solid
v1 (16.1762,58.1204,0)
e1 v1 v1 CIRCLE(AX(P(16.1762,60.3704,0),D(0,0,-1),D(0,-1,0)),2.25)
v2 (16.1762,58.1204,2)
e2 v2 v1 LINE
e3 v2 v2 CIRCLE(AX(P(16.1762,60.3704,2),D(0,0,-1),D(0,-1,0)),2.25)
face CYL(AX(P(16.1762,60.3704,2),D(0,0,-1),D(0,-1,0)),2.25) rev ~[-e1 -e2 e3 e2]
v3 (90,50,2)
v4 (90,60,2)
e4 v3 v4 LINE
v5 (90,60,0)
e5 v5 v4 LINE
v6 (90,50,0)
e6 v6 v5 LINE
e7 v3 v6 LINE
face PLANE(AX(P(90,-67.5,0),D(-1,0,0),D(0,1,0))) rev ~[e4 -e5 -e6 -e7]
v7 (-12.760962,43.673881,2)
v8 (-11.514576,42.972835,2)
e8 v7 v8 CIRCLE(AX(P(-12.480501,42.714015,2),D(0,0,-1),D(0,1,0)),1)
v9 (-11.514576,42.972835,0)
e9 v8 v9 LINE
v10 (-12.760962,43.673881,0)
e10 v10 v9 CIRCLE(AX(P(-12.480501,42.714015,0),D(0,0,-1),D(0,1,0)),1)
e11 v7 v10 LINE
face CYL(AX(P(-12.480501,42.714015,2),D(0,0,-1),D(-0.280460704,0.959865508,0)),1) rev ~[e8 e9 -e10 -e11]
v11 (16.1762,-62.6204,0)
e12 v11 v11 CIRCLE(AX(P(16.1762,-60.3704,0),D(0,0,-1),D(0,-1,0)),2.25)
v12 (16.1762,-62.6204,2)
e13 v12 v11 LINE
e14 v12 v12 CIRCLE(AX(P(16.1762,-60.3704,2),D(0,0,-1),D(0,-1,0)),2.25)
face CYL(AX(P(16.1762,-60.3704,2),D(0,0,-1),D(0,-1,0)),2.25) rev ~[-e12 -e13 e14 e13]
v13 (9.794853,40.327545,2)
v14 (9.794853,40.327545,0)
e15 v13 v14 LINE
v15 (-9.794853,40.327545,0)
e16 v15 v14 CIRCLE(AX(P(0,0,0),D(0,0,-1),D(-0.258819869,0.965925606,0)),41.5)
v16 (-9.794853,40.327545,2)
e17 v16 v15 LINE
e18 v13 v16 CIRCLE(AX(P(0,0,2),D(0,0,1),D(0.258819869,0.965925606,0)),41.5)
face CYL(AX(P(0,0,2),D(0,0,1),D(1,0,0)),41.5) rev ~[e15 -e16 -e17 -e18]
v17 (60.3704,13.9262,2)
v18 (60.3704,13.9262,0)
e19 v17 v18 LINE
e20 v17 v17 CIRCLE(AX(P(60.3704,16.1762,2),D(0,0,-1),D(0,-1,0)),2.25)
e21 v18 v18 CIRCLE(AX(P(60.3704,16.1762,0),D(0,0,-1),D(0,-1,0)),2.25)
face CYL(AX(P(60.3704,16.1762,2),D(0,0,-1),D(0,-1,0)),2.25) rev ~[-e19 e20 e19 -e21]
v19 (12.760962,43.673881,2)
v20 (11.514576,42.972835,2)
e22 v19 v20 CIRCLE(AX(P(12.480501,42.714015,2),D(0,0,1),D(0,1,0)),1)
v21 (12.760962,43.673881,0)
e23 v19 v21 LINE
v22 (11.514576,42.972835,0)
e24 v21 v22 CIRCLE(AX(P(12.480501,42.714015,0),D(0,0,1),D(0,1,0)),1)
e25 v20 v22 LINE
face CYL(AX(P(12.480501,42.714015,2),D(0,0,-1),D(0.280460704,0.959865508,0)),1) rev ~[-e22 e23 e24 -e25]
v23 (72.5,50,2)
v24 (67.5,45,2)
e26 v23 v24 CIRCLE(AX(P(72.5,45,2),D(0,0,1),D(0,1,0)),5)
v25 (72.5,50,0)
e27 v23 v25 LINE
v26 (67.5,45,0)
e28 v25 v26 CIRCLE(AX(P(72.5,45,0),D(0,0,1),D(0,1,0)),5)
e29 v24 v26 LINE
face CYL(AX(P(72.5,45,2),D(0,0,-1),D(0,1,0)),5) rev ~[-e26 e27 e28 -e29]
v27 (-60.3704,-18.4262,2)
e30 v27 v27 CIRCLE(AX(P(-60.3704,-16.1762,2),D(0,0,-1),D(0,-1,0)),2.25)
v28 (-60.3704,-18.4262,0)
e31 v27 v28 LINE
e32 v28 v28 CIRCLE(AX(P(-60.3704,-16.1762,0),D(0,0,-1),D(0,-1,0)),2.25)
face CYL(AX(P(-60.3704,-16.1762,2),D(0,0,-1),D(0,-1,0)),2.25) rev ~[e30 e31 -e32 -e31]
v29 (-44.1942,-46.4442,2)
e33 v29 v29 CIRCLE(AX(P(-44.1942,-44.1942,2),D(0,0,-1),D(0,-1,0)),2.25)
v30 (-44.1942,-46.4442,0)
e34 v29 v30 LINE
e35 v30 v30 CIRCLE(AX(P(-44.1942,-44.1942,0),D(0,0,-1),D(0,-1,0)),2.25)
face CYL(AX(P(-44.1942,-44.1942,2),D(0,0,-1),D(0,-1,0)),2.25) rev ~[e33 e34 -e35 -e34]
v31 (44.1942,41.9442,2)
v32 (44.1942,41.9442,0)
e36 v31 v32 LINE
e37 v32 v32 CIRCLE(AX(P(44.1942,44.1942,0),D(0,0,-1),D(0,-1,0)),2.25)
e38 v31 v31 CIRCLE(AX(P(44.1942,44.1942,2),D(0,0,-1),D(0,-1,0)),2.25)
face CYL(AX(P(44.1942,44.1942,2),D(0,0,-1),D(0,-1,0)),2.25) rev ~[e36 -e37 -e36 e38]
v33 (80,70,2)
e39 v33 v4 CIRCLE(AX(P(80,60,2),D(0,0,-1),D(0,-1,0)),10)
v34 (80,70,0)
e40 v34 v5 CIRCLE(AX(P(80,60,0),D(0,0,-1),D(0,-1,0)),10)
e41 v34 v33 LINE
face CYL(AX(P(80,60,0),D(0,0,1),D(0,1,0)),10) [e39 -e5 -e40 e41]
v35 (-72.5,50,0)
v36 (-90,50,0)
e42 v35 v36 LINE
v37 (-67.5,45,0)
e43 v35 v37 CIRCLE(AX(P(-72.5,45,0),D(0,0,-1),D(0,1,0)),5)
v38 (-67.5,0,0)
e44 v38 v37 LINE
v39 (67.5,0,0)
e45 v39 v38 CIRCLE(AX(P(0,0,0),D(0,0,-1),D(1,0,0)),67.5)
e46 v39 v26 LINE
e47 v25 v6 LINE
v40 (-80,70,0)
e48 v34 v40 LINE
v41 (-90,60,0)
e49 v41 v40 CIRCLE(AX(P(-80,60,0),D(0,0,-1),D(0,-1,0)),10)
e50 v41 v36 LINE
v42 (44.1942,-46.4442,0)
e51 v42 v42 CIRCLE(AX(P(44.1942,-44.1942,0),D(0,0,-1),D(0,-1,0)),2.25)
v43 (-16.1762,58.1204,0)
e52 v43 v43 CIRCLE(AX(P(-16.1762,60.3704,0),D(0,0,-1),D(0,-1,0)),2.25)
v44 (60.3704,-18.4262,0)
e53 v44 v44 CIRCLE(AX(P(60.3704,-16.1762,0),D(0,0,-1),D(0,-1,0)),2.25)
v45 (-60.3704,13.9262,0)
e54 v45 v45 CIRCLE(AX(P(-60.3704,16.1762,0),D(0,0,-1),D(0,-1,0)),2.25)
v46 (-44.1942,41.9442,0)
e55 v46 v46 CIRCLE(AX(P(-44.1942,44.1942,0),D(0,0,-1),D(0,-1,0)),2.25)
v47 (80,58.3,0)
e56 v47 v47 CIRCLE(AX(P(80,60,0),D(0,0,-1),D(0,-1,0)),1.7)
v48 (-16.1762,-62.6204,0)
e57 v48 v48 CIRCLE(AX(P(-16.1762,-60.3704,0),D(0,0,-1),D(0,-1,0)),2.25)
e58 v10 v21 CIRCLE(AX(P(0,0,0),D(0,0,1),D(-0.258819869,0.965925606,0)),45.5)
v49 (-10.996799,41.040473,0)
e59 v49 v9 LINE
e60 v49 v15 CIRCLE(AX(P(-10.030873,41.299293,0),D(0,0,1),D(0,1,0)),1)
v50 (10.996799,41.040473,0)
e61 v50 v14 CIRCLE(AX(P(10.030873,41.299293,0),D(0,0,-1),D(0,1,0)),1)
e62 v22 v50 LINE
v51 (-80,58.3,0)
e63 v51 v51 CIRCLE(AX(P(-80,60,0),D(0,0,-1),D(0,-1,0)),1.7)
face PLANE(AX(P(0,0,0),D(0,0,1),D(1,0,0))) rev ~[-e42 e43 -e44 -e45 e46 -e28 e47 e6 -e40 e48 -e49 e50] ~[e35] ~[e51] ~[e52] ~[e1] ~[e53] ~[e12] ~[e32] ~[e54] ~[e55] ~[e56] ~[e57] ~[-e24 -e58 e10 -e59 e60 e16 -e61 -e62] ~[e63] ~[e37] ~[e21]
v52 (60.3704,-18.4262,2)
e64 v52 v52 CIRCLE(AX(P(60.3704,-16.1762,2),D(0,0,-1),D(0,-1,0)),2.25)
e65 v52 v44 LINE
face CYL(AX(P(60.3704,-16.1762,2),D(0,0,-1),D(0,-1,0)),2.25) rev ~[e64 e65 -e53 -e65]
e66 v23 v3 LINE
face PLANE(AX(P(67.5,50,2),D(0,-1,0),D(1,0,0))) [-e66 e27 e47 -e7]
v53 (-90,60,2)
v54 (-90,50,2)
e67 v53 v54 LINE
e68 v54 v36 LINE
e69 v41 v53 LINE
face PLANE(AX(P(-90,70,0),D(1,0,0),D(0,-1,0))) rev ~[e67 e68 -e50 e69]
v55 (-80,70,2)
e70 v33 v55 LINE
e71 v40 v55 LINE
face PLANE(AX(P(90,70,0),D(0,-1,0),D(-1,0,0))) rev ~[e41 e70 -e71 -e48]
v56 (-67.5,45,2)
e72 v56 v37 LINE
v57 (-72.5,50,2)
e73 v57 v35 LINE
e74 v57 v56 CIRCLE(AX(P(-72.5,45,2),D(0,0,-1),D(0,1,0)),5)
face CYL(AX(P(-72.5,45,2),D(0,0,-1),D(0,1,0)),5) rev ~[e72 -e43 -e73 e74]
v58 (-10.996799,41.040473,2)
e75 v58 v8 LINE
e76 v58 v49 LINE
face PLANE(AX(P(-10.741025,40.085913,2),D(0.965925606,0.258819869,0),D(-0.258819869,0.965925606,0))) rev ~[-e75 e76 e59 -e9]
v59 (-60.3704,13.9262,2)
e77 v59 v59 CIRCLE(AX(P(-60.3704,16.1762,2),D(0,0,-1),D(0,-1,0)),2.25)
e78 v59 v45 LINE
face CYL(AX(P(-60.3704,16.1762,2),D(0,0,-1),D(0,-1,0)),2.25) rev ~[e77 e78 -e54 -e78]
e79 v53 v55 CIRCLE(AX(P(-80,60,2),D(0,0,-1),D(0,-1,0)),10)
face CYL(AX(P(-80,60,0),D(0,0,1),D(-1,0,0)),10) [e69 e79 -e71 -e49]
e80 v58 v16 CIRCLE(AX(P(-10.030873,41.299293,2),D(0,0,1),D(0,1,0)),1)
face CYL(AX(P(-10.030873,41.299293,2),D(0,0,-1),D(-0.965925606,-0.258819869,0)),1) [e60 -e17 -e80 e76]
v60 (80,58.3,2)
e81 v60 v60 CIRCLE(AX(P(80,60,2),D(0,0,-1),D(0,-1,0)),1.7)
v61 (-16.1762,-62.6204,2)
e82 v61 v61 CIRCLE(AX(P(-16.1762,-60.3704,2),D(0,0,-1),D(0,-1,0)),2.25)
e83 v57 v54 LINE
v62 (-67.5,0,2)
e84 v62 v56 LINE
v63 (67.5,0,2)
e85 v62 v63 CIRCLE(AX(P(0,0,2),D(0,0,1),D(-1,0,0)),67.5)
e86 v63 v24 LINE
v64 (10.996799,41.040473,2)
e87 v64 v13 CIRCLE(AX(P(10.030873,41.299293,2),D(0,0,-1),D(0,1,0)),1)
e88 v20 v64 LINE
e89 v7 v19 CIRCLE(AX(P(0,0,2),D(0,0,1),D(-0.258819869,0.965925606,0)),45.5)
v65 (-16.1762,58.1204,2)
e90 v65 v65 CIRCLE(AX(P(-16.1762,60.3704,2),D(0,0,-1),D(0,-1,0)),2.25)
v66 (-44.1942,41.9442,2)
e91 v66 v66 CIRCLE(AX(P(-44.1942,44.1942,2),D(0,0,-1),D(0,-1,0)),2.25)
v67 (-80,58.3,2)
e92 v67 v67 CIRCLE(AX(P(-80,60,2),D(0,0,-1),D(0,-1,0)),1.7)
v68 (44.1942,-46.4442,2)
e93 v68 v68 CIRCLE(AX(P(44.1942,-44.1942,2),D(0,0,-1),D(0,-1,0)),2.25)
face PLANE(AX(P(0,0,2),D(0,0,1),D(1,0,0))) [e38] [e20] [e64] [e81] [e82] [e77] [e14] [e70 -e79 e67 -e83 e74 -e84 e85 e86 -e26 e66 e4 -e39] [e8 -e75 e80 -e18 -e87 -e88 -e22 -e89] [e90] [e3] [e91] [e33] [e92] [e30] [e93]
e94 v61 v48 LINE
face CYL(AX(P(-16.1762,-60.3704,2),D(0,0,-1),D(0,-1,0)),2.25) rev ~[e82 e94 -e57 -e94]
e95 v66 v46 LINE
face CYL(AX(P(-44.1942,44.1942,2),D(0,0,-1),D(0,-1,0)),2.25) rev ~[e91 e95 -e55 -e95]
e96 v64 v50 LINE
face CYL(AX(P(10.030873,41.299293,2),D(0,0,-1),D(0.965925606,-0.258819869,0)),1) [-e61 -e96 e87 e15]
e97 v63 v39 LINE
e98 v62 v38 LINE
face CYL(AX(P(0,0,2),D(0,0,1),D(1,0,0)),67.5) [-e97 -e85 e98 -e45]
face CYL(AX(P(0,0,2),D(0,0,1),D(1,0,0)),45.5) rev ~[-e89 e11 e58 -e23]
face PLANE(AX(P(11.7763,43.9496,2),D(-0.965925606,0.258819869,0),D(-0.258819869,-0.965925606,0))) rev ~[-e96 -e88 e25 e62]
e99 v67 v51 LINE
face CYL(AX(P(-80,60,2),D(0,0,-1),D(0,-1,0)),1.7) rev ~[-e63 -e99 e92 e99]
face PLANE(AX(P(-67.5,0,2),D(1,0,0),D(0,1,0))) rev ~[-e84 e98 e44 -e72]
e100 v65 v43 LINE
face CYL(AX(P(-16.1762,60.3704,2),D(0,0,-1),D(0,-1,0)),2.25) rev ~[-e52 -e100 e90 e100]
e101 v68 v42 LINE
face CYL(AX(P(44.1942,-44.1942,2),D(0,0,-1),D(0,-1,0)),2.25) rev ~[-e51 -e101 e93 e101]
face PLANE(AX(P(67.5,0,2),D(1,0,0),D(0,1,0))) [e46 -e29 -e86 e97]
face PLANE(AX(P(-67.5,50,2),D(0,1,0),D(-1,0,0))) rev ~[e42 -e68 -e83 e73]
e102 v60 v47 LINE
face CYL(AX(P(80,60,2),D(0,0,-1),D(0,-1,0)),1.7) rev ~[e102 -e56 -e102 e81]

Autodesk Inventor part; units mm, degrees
ref_plane "YZ Plane" through (0, 0, 0) normal (1, 0, 0) x (0, 1, 0)
ref_plane "XZ Plane" through (0, 0, 0) normal (0, 1, 0) x (-1, 0, 0)
ref_plane "XY Plane" through (0, 0, 0) normal (0, 0, 1) x (1, 0, 0)
sketch "スケッチ1" plane through (0, 0, 0) normal (0, 0, 1) x (1, 0, 0)
  line L0 (-90, -67.5) -> (90, -67.5)
  line L1 (90, -67.5) -> (90, 70)
  line L2 (90, 70) -> (-90, 70)
  line L3 (-90, 70) -> (-90, -67.5)
  point P0 (0, 0)
  point P1 (-29.0861, -67.5)
  dimension "d37" = 90
  dimension "d38" = 70
  dimension "d40" = 90
  dimension "d41" = 67.5
extrude "プレート1" add sketch "スケッチ1" along normal blind 2
sketch "スケッチ2" plane through (0, 0, 2) normal (0, 0, 1) x (1, 0, 0)
  circle A0 centre (0, 0) radius 45.5
  dimension "d5" = 91
extrude "押し出し1" cut sketch "スケッチ2" against normal blind 10
sketch "スケッチ3" plane through (0, 0, 2) normal (0, 0, 1) x (1, 0, 0)
  circle A0 centre (0, 0) radius 62.5
  point P0 (-16.1762, 60.3704)
  point P1 (-44.1942, 44.1942)
  point P2 (-60.3704, 16.1762)
  point P3 (-60.3704, -16.1762)
  point P4 (-44.1942, -44.1942)
  point P5 (-16.1762, -60.3704)
  point P6 (16.1762, -60.3704)
  point P7 (44.1942, -44.1942)
  point P8 (60.3704, -16.1762)
  point P9 (60.3704, 16.1762)
  point P10 (44.1942, 44.1942)
  point P11 (16.1762, 60.3704)
  dimension "d8" = 125
  dimension "d11" = 360
  dimension "d20" = 0
hole "穴1" at (-16.1762, 60.3704, 2) at (-44.1942, 44.1942, 2) at (-60.3704, 16.1762, 2) at (-60.3704, -16.1762, 2) at (-44.1942, -44.1942, 2) at (-16.1762, -60.3704, 2) at (16.1762, -60.3704, 2) at (44.1942, -44.1942, 2) at (60.3704, -16.1762, 2) at (60.3704, 16.1762, 2) at (44.1942, 44.1942, 2) at (16.1762, 60.3704, 2) direction (0, 0, -1) diameter 4.5 end through all clearance for "Flat Head Machine Screw" size "M4" standard "Ansi Metric M Profile"
fillet "コーナーR2" radius 10 2 edges at (-90, 70, 1) (90, 70, 1)
sketch "スケッチ5" plane through (0, 0, 2) normal (0, 0, 1) x (1, 0, 0)
  arc A0 (-80, 70) -> (-90, 60) centre (-80, 60) ccw projected
  arc A1 (90, 60) -> (80, 70) centre (80, 60) ccw projected
  point P0 (0, 0)
hole "穴2" at (-80, 60, 2) at (80, 60, 2) direction (0, 0, -1) diameter 3.4 end through all clearance for "Socket Head Cap Screw" size "M3" standard "Ansi Metric M Profile"
sketch "スケッチ7" plane through (0, 0, 2) normal (0, 0, 1) x (1, 0, 0)
  circle A0 centre (0, 0) radius 45.5 projected
  circle A1 centre (0, 0) radius 67.5
  line L0 (90, -67.5) -> (-90, -67.5) projected
  line L1 (-90, -67.5) -> (-90, 60) projected
  line L2 (-90, -67.5) -> (-67.5, -67.5)
  line L3 (-67.5, -67.5) -> (-67.5, 50)
  line L4 (-67.5, 50) -> (-90, 50)
  line L5 (-90, 50) -> (-90, -67.5)
  line L6 (90, -67.5) -> (67.5, -67.5)
  line L7 (67.5, -67.5) -> (67.5, 50)
  line L8 (67.5, 50) -> (90, 50)
  line L9 (90, 50) -> (90, -67.5)
  line L10 (-80, 70) -> (80, 70) projected
  point P0 (67.5, 0)
  point P1 (0, -67.5)
  point P2 (-67.5, 0)
  dimension "d56" = 20
  dimension "d57" = 20
extrude "押し出し4" cut sketch "スケッチ7" against normal blind 10 contours L7 L0 A1 | L7 L8 L9 L0 | A1 L0 L3 | L3 L0 L1 L4
fillet "コーナーR4" radius 5 2 edges at (-67.5, 50, 1) (67.5, 50, 1)
sketch "スケッチ9" plane through (0, 0, 2) normal (0, 0, 1) x (1, 0, 0)
  circle A0 centre (0, 0) radius 45.5 projected
  circle A1 centre (0, 0) radius 41.5
  line L0 (0, 0) -> (-11.7763, 43.9496)
  line L1 (11.7763, 43.9496) -> (0, 0)
  line L2 (0, 97.5) -> (0, -95) projected
  point P0 (-10.741, 40.0859)
  point P1 (10.741, 40.0859)
  dimension "d76" = 4
  dimension "d77" = 15
  dimension "d78" = 15
extrude "押し出し5" add sketch "スケッチ9" against normal up to surface (2 mm away) contours L1 A1 L2 A0 | L2 A1 L0 A0 picked at (5.1612, 43.8259) picked at (-6.3577, 43.6684)
fillet "コーナーR5" radius 1 4 edges at (10.741, 40.0859, 1) (-10.741, 40.0859, 1) (-11.7763, 43.9496, 1) (11.7763, 43.9496, 1)
equation "\"d40\" = d37"
equation "\"d18\" = Thickness"
equation "\"d47\" = Thickness"
equation "\"d2\" = Thickness"
equation "\"BendRadius\" = Thickness"
equation "\"BendReliefWidth\" = Thickness"
equation "\"BendReliefDepth\" = 0.5 * Thickness"
equation "\"CornerReliefSize\" = 4 * Thickness"
equation "\"MinimumRemnant\" = 2 * Thickness"
equation "\"TransitionRadius\" = BendRadius"
equation "\"JacobiRadiusSize\" = BendRadius"
equation "\"GapSize\" = Thickness"
equation "\"Thickness\" = 2"
properties part number "base4" material "CFRP"
